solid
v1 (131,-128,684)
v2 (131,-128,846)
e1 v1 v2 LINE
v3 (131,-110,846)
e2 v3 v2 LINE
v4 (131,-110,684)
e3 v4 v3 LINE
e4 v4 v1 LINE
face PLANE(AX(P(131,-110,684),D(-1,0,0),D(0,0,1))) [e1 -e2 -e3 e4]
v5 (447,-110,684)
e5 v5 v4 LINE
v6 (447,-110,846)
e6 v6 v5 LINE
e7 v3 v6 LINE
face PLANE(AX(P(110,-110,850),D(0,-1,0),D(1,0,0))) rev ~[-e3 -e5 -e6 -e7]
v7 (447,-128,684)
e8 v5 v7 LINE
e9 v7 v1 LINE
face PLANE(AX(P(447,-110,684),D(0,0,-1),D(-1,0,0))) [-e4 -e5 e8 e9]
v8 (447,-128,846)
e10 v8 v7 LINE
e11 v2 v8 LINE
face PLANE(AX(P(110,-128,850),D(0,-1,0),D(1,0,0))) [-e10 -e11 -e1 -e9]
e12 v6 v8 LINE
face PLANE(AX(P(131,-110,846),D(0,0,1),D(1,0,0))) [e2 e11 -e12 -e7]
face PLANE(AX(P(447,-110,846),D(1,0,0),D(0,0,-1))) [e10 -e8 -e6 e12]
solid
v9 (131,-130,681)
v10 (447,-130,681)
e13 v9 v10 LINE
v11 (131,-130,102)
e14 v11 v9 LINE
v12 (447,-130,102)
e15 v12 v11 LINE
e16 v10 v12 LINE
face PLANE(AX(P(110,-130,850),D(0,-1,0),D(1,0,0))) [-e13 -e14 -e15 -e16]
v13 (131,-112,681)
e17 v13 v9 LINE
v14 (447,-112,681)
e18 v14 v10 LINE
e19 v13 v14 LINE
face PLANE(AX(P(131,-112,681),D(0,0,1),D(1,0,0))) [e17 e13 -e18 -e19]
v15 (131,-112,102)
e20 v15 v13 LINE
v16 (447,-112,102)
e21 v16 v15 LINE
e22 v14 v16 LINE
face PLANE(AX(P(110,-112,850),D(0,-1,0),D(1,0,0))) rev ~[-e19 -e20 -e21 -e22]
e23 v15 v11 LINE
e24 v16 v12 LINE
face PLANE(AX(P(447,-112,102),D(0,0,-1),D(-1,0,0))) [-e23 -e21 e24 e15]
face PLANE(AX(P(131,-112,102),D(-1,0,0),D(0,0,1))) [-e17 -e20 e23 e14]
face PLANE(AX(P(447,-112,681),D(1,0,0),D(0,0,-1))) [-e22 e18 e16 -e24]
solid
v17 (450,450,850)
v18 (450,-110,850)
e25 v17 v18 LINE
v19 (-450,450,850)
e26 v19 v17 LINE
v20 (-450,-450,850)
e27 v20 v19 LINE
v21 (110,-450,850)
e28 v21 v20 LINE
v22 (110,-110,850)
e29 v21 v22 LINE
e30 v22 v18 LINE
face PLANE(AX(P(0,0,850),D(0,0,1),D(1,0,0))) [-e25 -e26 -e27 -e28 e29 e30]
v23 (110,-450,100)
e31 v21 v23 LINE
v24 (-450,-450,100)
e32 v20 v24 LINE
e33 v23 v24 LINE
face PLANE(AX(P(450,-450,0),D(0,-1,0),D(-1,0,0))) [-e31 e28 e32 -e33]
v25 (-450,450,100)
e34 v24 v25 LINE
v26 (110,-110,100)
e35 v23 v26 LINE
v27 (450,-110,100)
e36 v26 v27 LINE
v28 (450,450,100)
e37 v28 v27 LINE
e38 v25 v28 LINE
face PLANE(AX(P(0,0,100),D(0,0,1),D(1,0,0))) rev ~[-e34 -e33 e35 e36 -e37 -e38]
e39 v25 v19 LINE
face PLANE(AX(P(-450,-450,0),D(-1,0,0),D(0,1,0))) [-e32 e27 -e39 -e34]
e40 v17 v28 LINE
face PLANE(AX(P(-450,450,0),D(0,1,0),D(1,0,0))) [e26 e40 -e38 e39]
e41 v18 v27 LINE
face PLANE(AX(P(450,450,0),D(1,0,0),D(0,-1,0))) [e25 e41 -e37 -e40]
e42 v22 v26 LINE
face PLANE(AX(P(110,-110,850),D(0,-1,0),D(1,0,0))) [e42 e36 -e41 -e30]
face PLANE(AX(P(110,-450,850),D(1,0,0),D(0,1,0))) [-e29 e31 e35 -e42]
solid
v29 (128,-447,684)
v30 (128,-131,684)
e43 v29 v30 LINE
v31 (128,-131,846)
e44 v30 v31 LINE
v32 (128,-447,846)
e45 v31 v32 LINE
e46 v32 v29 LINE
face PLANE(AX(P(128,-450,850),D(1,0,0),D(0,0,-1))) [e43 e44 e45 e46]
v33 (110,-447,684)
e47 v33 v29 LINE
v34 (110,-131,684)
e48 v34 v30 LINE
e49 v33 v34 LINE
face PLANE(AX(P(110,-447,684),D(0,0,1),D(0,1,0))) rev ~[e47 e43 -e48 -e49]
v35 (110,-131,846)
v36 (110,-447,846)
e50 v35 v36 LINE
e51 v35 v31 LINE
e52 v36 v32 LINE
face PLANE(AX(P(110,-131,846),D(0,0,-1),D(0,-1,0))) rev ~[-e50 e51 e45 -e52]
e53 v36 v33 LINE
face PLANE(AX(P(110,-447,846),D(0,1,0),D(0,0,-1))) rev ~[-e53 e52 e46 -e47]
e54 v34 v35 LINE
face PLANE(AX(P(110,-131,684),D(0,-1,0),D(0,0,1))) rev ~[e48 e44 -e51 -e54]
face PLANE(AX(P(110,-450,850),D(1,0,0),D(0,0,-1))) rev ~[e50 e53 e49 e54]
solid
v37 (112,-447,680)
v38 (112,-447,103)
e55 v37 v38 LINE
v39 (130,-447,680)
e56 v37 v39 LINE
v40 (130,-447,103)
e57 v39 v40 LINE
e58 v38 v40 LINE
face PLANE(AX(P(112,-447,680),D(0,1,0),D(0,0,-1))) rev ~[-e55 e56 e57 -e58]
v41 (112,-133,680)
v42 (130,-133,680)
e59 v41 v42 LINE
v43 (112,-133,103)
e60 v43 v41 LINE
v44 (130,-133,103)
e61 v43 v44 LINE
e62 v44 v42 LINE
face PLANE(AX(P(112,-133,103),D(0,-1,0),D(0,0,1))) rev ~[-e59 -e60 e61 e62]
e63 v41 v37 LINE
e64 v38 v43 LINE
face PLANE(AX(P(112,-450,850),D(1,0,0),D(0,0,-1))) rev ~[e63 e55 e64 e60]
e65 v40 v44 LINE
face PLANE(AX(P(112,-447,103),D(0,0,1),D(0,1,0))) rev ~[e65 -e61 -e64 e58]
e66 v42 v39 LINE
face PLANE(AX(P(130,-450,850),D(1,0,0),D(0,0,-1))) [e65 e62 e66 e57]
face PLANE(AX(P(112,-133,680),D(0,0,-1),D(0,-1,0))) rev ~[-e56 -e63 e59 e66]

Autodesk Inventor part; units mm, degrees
ref_plane "YZ Plane" through (0, 0, 0) normal (1, 0, 0) x (0, 1, 0)
ref_plane "XZ Plane" through (0, 0, 0) normal (0, 1, 0) x (-1, 0, 0)
sketch "Sketch1" plane through (0, 0, 0) normal (0, 0, 1) x (1, 0, 0)
  line L0 (-450, 450) -> (450, 450)
  line L1 (450, 450) -> (450, -450)
  line L2 (450, -450) -> (-450, -450)
  line L3 (-450, -450) -> (-450, 450)
  line L4 (-450, 450) -> (450, -450) construction
  line L5 (450, 450) -> (-450, -450) construction
  point P0 (0, 0)
  dimension "Width" = 900
  dimension "Depth" = 900
extrude "Extrusion1" add sketch "Sketch1" along normal blind 850
move faces "Move1" translate (0, 0, 100) faces at (-150, -150, 0)
sketch "Sketch2" plane through (0, 0, 850) normal (0, 0, 1) x (1, 0, 0)
  line L0 (450, 450) -> (-450, 450) projected
  line L1 (-450, 450) -> (-450, -450) projected
  line L2 (-450, -450) -> (450, -450) projected
  line L3 (450, -450) -> (450, 450) projected
  line L4 (450, -450) -> (450, 450) projected
  line L5 (450, -110) -> (110, -450)
  line L6 (-450, -450) -> (450, -450) projected
  point P0 (0, 0)
  dimension "d4" = 560
  dimension "d5" = 560
extrude "Extrusion2" cut sketch "Sketch2" against normal up to surface (850 mm away) contours L3 L2 L5
sketch "Sketch6" plane through (0, 0, 850) normal (0, 0, 1) x (1, 0, 0)
  line L0 (110, -450) -> (450, -110) projected
  line L1 (450, -110) -> (450, 450) projected
  line L2 (450, 450) -> (-450, 450) projected
  line L3 (-450, 450) -> (-450, -450) projected
  line L4 (-450, -450) -> (110, -450) projected
  line L5 (110, -450) -> (110, -110)
  line L6 (110, -110) -> (450, -110)
  point P0 (0, 0)
extrude "Extrusion7" cut sketch "Sketch6" against normal up to surface (750 mm away) contours L5 L6 L0
ref_plane "Work Plane1" through (0, 0, 684) normal (0, 0, 1) x (1, 0, 0)
sketch "Sketch7" plane through (110, -110, 850) normal (0, -1, 0) x (1, 0, 0)
  line L0 (340, -750) -> (0, -750) construction
  line L1 (340, 0) -> (340, -750) construction
  line L2 (0, 0) -> (340, 0) construction
  line L3 (0, 0) -> (0, -750) construction
  line L4 (-740, -166) -> (520, -166) construction
  line L5 (21, -4) -> (337, -4)
  line L6 (337, -4) -> (337, -166)
  line L7 (337, -166) -> (21, -166)
  line L8 (21, -166) -> (21, -4)
  point P0 (-110, -850)
  dimension "d33" = 3
  dimension "d34" = 21
  dimension "d35" = 4
extrude "Extrusion8" add sketch "Sketch7" along normal blind 18 separate body
sketch "Sketch8" plane through (110, -110, 850) normal (0, -1, 0) x (1, 0, 0)
  line L0 (340, -750) -> (0, -750) construction
  line L1 (340, 0) -> (340, -750) construction
  line L2 (0, 0) -> (340, 0) construction
  line L3 (0, 0) -> (0, -750) construction
  line L4 (337, -4) -> (21, -4) construction
  line L5 (21, -4) -> (21, -166) construction
  line L6 (21, -166) -> (337, -166) construction
  line L7 (337, -166) -> (337, -4) construction
  line L8 (21, -169) -> (337, -169)
  line L9 (337, -169) -> (337, -748)
  line L10 (337, -748) -> (21, -748)
  line L11 (21, -748) -> (21, -169)
  point P0 (-110, -850)
  dimension "d38" = 2
  dimension "d39" = 3
  dimension "d40" = 21
  dimension "d41" = 3
extrude "Extrusion9" add sketch "Sketch8" along normal blind 18 separate body
move or copy body "Move4" bodies to move or copy 3 copy no translate (0, -2, 0)
sketch "Sketch9" plane through (110, -450, 850) normal (1, 0, 0) x (0, 0, -1)
  line L0 (750, 340) -> (750, 0) construction
  line L1 (0, 340) -> (750, 340) construction
  line L2 (0, 0) -> (0, 340) construction
  line L3 (750, 0) -> (0, 0) construction
  line L4 (166, -180) -> (166, 1080) construction
  line L5 (4, 3) -> (166, 3)
  line L6 (166, 3) -> (166, 319)
  line L7 (166, 319) -> (4, 319)
  line L8 (4, 319) -> (4, 3)
  line L9 (4, 340) -> (166, 340) projected
  line L10 (4, 340) -> (4, 322) projected
  line L11 (166, 322) -> (4, 322) projected
  line L12 (166, 340) -> (166, 322) projected
  point P0 (850, 450)
  dimension "d53" = 3
  dimension "d54" = 4
  dimension "d55" = 3
extrude "Extrusion10" add sketch "Sketch9" along normal blind 18 separate body contours L8 L7 L6 L5
sketch "Sketch10" plane through (110, -450, 850) normal (1, 0, 0) x (0, 0, -1)
  line L0 (750, 340) -> (750, 0) construction
  line L1 (0, 340) -> (750, 340) construction
  line L2 (0, 0) -> (0, 340) construction
  line L3 (750, 0) -> (0, 0) construction
  line L4 (4, 3) -> (166, 3) construction
  line L5 (166, 3) -> (166, 319) construction
  line L6 (166, 319) -> (4, 319) construction
  line L7 (4, 319) -> (4, 3) construction
  line L8 (170, 3) -> (747, 3)
  line L9 (747, 3) -> (747, 317)
  line L10 (747, 317) -> (170, 317)
  line L11 (170, 317) -> (170, 3)
  line L12 (169, 338) -> (748, 338) projected
  line L13 (169, 338) -> (169, 320) projected
  line L14 (748, 320) -> (169, 320) projected
  line L15 (748, 338) -> (748, 320) projected
  point P0 (850, 450)
  dimension "d58" = 3
  dimension "d59" = 3
  dimension "d60" = 3
  dimension "d61" = 4
extrude "Extrusion11" add sketch "Sketch10" along normal blind 18 separate body contours L11 L10 L9 L8
move or copy body "Move5" bodies to move or copy 5 copy no translate (2, 0, 0)
equation "\"d36\" = Panel_thickness"
equation "\"d42\" = Panel_thickness"
equation "\"d56\" = Panel_thickness"
equation "\"d62\" = Panel_thickness"
equation "\"Panel_thickness\" = 18"
properties part number "Placed 90 d corner cabinet door"
